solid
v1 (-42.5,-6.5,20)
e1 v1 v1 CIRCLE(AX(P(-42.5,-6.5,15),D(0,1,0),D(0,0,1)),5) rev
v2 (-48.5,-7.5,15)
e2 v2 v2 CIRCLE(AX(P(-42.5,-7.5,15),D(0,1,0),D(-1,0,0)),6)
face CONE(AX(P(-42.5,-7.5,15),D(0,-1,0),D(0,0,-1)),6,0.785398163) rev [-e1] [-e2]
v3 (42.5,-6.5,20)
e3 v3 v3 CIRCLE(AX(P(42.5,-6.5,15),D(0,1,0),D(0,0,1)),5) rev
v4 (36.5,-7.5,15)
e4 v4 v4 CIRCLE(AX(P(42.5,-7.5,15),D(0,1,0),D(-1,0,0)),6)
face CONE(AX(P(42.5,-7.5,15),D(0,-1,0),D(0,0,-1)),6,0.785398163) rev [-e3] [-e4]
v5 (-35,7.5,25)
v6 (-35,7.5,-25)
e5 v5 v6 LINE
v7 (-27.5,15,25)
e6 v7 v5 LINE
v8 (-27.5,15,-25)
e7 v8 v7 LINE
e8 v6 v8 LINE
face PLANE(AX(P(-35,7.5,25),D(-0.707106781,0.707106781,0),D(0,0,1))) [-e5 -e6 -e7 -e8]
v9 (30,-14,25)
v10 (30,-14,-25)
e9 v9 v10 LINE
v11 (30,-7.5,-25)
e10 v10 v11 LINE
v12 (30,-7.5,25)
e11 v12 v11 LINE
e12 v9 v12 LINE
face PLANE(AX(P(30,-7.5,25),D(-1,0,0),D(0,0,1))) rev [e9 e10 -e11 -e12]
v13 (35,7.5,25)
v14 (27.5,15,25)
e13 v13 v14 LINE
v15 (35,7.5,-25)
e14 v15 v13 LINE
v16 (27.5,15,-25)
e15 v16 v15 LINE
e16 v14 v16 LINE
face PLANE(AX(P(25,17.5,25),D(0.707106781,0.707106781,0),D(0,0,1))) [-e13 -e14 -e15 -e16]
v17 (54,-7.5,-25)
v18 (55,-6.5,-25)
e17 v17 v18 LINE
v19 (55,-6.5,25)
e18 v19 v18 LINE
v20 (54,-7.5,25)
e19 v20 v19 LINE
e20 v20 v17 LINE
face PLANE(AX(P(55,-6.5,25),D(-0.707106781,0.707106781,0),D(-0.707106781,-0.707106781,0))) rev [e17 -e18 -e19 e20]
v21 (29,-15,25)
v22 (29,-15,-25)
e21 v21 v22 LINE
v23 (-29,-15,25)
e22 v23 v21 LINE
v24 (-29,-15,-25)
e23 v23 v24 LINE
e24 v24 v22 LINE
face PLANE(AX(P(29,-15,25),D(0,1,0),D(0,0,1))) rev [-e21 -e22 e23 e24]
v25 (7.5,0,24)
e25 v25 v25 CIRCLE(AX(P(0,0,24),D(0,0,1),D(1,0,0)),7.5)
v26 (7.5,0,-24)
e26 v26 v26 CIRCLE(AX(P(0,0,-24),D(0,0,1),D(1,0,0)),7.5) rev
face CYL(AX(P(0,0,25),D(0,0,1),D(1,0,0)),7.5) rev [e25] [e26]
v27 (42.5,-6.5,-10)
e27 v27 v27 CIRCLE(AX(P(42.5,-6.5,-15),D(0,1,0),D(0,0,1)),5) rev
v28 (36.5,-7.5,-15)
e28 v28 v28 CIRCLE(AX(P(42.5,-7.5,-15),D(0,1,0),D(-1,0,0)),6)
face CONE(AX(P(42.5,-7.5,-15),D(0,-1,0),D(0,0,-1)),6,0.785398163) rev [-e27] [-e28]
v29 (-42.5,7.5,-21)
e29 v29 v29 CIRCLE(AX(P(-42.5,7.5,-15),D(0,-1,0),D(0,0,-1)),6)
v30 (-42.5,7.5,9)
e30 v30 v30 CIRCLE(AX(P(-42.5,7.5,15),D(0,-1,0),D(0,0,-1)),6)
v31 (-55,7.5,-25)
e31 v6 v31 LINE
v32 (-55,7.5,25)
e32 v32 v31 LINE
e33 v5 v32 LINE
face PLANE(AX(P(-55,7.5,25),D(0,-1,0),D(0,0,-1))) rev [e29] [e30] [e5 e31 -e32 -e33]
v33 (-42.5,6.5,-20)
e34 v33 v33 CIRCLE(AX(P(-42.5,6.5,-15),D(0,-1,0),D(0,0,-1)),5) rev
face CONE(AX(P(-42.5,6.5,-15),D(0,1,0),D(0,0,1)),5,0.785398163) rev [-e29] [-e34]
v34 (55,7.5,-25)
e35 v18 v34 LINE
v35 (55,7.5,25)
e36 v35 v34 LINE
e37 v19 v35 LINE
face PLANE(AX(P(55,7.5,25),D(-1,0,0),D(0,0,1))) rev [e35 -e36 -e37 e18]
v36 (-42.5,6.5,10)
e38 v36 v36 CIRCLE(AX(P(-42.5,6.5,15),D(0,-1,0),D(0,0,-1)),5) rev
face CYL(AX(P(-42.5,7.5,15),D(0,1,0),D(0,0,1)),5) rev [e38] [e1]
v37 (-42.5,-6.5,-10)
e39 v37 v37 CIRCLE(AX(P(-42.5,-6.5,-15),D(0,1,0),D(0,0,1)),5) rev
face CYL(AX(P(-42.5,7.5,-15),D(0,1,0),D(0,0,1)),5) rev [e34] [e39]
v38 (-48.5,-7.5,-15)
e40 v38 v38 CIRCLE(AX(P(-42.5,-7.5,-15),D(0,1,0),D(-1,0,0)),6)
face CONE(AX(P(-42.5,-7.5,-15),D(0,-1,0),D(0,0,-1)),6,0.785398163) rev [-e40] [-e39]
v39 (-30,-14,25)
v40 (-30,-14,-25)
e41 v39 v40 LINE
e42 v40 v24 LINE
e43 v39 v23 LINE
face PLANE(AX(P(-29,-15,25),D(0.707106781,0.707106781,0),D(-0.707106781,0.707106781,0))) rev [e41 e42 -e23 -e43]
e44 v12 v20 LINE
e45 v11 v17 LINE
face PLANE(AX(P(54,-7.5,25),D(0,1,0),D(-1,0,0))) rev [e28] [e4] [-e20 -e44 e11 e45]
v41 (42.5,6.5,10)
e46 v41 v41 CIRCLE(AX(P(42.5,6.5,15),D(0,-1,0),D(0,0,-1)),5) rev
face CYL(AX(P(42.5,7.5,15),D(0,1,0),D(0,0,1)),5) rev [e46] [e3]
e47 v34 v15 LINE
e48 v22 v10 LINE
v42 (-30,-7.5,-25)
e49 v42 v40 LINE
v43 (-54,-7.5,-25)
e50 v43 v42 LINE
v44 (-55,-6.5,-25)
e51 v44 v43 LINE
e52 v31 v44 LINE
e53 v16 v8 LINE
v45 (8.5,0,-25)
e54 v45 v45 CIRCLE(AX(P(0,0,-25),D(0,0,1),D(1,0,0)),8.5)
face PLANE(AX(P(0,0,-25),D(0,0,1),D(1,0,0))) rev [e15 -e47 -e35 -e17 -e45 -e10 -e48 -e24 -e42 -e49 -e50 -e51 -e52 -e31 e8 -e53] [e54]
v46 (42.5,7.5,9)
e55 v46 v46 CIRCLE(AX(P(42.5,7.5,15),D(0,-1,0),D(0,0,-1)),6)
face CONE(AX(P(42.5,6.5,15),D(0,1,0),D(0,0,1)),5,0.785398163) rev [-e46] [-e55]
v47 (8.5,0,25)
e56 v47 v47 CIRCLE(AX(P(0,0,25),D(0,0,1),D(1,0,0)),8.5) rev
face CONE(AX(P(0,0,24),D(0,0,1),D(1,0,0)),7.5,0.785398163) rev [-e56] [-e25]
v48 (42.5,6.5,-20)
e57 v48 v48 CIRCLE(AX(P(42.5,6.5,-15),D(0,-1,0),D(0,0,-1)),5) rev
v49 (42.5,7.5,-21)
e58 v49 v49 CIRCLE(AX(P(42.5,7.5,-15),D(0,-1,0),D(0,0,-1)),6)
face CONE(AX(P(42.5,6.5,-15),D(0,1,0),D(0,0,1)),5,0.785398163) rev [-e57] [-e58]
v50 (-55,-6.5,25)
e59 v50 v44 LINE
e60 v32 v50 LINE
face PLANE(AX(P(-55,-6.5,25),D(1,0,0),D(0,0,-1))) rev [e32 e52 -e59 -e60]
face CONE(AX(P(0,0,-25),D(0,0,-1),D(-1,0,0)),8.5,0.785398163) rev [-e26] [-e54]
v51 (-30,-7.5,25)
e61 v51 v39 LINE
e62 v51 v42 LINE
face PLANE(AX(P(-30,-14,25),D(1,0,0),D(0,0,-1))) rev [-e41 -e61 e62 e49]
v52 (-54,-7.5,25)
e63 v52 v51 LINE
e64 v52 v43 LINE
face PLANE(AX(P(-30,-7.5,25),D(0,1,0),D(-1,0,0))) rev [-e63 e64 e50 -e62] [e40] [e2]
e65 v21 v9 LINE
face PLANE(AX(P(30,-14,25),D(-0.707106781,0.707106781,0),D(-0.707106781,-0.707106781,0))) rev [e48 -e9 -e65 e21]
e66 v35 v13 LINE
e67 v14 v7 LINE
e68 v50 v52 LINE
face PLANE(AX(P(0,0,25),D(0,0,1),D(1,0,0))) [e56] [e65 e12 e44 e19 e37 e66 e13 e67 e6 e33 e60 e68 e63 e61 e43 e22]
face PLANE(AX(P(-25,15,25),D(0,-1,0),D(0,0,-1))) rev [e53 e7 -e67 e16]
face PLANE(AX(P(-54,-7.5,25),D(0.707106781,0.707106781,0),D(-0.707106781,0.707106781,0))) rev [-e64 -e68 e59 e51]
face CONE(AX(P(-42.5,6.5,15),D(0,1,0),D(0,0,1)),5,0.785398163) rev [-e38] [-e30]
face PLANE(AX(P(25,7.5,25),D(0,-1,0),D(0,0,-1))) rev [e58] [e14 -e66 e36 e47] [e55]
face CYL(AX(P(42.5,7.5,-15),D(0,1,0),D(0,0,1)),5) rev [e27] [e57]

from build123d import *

# Parameters (mm, degrees)
BOSS_EXTRUDE1_DEPTH = 25
CHAMFER2_SIZE       = 10
HOLE1_D             = 15
CHAMFER3_SIZE       = 1
HOLE2_D             = 10
CHAMFER4_SIZE       = 1
CHAMFER5_SIZE       = 1


with BuildPart() as part:
    # Sketch1 → Boss-Extrude1 (new, symmetric)
    with BuildSketch(Plane.XY):
        Polygon((-55, -6.5), (-55, 7.5), (-25, 7.5), (-25, 15), (25, 15), (25, 7.5), (55, 7.5), (55, -6.5), (54, -7.5), (30, -7.5), (30, -14), (29, -15), (-29, -15), (-30, -14), (-30, -7.5), (-54, -7.5), align=None)
    extrude(amount=BOSS_EXTRUDE1_DEPTH, both=True)

    # Chamfer2
    # the kernel refuses this chamfer: 10 mm, written as the material it adds along each edge
    with BuildSketch(Plane(origin=(25, 7.5, 25), x_dir=(0.9996219169112968, -0.027495876610586403, 0), z_dir=(0, 0, -1))) as chamfer2_piece_1_section:
        Polygon((CHAMFER2_SIZE * 0.999621916911, -CHAMFER2_SIZE * 0.0274958766106), (-CHAMFER2_SIZE * 0.0274958766106, -CHAMFER2_SIZE * 0.999621916911), (0, 0), align=None)
    chamfer2_piece_1 = extrude(amount=50, mode=Mode.PRIVATE)
    chamfer2_piece_1 = split(chamfer2_piece_1, bisect_by=Plane(origin=(28.519591102, 15, 0), z_dir=(0, -1, 0)), keep=Keep.TOP, mode=Mode.PRIVATE)
    add(chamfer2_piece_1)
    with BuildSketch(Plane(origin=(-25, 7.5, 25), x_dir=(0.027495876610586317, 0.9996219169112968, 0), z_dir=(0, 0, -1))) as chamfer2_piece_2_section:
        Polygon((CHAMFER2_SIZE * 0.999621916911, -CHAMFER2_SIZE * 0.0274958766106), (-CHAMFER2_SIZE * 0.0274958766106, -CHAMFER2_SIZE * 0.999621916911), (0, 0), align=None)
    chamfer2_piece_2 = extrude(amount=50, mode=Mode.PRIVATE)
    chamfer2_piece_2 = split(chamfer2_piece_2, bisect_by=Plane(origin=(-28.519591102, 15, 0), z_dir=(0, -1, 0)), keep=Keep.TOP, mode=Mode.PRIVATE)
    add(chamfer2_piece_2)

    # Hole1 (through all)
    with Locations(Plane.XY.offset(25)):
        with Locations((0, 0)):
            Hole(HOLE1_D / 2)

    # Chamfer3
    chamfer3_edges = [part.edges().sort_by_distance(p)[0] for p in [
        (7.5, 0, 25),
        (7.5, 0, -25),
    ]]
    chamfer(chamfer3_edges, length=CHAMFER3_SIZE)

    # Hole2 (through all)
    with Locations(Plane(origin=(0, 7.5, 0), x_dir=(1, 0, 0), z_dir=(0, 1, 0))):
        with Locations((42.5, 15), (42.5, -15)):
            hole2 = Hole(HOLE2_D / 2)

    # Chamfer4
    chamfer4_edges = [part.edges().sort_by_distance(p)[0] for p in [
        (47.5, 7.5, 15),
        (47.5, -7.5, 15),
        (47.5, 7.5, -15),
        (47.5, -7.5, -15),
    ]]
    chamfer(chamfer4_edges, length=CHAMFER4_SIZE)

    # Mirror5: Hole2 across plane
    add(hole2.mirror(Plane(origin=(0, 0, 0), x_dir=(0, 0, 1), z_dir=(1, 0, 0))), mode=Mode.SUBTRACT)

    # Chamfer5
    chamfer5_edges = [part.edges().sort_by_distance(p)[0] for p in [
        (-47.5, 7.5, 15),
        (-47.5, -7.5, 15),
        (-47.5, 7.5, -15),
        (-47.5, -7.5, -15),
    ]]
    chamfer(chamfer5_edges, length=CHAMFER5_SIZE)


solid = part.part
